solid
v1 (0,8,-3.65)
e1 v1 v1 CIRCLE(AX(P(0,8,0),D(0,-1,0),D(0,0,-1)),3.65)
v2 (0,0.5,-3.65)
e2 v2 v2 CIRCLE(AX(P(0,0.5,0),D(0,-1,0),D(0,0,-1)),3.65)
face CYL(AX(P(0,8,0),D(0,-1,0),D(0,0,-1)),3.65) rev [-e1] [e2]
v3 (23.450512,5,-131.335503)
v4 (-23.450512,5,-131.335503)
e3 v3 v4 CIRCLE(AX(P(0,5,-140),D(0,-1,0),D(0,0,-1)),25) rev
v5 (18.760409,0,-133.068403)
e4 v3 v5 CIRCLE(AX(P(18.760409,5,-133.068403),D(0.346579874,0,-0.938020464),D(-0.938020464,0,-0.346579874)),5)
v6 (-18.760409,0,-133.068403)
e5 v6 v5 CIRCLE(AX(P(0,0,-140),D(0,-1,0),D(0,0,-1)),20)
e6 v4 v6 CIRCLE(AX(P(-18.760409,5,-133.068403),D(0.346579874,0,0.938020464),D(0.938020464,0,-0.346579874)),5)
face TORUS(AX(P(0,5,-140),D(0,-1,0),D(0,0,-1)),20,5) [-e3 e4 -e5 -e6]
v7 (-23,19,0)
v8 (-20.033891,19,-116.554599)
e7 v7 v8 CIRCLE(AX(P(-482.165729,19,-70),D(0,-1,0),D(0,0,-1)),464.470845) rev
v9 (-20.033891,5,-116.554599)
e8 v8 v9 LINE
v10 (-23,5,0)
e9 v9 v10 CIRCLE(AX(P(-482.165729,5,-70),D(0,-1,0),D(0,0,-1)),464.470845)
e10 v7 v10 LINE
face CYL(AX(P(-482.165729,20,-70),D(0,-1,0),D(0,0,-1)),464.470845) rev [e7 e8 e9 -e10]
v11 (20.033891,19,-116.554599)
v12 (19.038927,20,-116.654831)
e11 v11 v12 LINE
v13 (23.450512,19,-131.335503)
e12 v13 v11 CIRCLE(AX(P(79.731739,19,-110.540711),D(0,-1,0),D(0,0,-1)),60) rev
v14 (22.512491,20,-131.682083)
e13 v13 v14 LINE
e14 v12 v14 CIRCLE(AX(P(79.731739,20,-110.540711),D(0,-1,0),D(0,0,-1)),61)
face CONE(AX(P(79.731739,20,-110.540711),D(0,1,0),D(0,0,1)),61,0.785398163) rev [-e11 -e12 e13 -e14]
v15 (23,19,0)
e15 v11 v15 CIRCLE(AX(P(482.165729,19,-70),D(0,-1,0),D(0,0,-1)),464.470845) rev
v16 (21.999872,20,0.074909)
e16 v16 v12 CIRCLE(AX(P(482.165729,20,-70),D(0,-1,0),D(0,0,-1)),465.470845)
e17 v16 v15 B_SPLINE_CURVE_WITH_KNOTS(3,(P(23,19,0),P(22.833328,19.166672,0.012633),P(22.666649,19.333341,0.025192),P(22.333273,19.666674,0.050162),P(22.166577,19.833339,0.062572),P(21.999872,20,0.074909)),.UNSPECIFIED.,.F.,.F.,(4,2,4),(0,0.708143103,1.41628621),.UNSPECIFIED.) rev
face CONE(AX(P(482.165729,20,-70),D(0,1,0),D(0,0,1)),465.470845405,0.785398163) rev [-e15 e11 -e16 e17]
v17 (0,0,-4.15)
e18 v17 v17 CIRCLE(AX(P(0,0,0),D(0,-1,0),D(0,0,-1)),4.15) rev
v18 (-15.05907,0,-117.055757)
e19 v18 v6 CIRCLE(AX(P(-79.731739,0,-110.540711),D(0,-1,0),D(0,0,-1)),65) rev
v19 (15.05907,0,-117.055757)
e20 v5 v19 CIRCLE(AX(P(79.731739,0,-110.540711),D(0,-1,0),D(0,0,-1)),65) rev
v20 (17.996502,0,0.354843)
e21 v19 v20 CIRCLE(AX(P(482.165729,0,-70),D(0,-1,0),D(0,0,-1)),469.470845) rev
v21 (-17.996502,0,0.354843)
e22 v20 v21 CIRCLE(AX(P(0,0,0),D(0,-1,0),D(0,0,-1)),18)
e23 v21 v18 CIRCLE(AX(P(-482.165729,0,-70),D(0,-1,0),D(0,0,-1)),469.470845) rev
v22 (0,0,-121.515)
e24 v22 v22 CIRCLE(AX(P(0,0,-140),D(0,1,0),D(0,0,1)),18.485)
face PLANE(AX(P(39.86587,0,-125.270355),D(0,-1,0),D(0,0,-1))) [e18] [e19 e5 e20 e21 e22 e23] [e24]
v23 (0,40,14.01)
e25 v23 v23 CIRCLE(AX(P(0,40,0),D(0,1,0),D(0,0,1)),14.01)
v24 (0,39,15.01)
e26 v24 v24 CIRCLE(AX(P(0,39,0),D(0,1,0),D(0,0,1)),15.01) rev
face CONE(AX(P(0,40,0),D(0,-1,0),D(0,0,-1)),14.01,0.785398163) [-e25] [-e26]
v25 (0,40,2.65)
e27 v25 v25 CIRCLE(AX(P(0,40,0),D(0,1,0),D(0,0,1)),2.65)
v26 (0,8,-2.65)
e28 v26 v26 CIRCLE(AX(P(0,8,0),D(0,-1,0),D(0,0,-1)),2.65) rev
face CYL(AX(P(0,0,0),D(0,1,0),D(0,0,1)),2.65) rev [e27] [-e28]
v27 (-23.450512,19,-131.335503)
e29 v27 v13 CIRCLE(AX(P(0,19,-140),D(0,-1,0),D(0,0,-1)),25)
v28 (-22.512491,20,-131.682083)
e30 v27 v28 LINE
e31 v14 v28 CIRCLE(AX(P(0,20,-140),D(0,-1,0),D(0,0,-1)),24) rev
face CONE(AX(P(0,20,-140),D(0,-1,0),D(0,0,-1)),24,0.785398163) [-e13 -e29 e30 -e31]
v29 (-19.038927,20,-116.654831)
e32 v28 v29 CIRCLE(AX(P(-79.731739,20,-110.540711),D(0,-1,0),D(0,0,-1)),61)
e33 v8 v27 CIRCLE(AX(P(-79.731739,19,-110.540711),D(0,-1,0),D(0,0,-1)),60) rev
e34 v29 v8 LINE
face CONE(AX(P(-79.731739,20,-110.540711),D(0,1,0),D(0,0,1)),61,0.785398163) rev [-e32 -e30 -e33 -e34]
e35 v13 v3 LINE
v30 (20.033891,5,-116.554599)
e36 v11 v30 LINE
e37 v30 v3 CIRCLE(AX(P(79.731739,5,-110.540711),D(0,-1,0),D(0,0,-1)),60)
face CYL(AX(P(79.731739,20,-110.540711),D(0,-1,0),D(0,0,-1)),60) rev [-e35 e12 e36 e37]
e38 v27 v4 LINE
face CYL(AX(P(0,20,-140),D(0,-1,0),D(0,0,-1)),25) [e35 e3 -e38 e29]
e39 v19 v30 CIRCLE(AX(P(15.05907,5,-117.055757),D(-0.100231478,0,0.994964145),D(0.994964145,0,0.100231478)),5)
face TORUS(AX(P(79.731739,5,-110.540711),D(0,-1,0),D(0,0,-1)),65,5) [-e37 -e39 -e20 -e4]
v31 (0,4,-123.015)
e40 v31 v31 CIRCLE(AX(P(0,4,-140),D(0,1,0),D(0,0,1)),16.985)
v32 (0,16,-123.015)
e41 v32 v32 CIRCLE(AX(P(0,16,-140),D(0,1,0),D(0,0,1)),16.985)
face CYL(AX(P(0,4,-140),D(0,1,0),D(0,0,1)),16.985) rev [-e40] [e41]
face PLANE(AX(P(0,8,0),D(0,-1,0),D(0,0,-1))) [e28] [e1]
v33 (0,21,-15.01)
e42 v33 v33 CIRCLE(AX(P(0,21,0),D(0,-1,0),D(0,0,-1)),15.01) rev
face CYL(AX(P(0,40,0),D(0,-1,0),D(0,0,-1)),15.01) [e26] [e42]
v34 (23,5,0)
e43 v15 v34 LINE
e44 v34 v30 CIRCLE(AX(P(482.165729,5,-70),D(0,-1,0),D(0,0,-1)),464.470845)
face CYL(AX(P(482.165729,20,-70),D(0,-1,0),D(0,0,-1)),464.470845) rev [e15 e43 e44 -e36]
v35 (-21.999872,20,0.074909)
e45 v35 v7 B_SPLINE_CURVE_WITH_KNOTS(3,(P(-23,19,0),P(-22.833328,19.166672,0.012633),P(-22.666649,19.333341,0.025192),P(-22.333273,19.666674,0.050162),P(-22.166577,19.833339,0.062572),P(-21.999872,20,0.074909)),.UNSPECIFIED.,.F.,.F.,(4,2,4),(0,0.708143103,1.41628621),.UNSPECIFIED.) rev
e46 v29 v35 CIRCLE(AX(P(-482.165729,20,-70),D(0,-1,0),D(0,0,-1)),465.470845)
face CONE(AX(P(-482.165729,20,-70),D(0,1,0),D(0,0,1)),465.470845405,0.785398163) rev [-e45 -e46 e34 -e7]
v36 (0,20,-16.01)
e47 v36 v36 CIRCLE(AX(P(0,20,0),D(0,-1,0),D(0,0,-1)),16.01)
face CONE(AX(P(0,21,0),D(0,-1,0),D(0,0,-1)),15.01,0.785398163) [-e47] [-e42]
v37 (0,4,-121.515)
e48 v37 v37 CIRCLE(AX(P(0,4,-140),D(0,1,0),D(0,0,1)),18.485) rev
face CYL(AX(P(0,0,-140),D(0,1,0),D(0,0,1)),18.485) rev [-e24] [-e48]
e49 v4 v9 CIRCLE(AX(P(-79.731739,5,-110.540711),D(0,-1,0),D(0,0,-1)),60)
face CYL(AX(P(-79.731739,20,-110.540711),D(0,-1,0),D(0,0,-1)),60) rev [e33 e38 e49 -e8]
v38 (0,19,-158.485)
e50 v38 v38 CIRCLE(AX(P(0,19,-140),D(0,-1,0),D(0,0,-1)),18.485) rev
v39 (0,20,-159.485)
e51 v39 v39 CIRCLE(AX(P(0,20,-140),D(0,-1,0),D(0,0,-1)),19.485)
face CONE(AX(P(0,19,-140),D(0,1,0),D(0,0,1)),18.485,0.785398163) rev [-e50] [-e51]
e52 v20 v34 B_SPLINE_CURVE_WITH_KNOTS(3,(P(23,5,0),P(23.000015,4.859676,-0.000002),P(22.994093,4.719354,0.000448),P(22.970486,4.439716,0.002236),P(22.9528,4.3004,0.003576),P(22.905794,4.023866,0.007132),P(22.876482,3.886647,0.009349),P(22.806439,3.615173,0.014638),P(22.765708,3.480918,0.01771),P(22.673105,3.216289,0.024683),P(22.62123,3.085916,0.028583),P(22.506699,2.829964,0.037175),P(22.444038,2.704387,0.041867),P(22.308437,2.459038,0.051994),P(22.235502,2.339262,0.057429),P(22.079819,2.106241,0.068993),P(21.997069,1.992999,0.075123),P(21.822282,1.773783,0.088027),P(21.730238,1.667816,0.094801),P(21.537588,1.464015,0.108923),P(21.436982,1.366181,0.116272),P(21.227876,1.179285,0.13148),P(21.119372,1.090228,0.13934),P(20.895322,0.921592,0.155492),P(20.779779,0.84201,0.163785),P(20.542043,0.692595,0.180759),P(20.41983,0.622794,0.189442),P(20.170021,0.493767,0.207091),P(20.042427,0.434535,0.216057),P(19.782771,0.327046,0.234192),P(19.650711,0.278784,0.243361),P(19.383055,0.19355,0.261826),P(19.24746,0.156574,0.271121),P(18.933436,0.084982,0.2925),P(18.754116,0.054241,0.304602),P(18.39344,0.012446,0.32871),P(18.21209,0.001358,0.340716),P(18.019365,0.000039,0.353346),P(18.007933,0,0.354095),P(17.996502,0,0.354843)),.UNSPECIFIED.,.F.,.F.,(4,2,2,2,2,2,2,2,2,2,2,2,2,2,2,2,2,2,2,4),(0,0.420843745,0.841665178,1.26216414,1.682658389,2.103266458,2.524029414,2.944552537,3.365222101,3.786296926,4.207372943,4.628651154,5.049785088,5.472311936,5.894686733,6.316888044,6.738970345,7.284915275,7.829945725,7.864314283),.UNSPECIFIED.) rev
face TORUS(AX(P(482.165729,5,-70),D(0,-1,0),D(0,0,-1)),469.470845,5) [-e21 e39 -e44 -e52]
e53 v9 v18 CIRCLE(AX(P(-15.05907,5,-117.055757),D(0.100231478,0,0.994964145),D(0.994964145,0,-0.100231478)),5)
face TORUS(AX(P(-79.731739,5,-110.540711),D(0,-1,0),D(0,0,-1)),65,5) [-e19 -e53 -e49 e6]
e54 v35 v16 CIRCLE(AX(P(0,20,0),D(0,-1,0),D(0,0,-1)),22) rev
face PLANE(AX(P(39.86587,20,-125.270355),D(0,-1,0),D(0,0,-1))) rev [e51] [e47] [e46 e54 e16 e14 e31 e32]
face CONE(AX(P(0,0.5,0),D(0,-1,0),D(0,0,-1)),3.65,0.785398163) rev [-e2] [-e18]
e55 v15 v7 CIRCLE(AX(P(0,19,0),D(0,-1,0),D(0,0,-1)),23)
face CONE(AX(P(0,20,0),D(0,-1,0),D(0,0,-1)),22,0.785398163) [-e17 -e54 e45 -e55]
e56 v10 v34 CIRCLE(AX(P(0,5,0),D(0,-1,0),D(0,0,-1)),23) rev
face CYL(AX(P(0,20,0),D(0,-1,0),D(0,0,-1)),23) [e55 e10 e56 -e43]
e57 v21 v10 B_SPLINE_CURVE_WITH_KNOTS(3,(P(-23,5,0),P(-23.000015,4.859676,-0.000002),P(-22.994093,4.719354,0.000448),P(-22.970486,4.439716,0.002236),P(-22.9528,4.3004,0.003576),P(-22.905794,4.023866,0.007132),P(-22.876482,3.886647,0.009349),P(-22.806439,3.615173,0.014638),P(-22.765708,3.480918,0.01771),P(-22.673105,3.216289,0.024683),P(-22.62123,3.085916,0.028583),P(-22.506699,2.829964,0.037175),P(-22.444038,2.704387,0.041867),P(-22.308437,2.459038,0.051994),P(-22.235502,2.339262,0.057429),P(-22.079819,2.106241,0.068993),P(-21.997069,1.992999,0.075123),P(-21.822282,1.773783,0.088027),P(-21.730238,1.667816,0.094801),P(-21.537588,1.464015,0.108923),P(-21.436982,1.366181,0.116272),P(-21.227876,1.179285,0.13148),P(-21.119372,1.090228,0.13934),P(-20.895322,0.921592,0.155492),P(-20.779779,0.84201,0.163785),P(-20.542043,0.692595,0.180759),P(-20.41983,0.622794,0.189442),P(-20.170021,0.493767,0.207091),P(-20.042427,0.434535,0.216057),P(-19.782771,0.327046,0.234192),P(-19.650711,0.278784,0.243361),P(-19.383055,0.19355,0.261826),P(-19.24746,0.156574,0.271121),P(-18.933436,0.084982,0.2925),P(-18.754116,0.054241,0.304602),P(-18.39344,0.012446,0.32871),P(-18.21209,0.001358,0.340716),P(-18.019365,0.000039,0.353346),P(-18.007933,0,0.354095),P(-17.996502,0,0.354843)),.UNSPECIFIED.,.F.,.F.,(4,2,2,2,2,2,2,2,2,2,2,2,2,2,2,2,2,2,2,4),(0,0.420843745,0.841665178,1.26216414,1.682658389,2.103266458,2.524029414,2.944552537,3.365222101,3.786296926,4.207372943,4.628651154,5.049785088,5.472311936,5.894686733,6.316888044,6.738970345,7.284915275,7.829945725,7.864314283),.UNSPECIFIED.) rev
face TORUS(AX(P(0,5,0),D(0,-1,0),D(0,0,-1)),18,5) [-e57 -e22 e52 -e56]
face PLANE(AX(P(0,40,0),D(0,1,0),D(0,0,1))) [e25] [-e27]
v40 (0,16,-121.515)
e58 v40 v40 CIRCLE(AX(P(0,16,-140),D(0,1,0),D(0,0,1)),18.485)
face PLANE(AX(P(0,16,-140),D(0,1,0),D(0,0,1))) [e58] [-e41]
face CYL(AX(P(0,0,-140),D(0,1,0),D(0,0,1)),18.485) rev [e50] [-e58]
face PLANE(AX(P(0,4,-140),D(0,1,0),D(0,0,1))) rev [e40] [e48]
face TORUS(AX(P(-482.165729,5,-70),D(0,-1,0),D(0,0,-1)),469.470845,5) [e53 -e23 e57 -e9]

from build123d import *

# Parameters (mm, degrees)
BOSS_EXTRUDE1_DEPTH      = 20
SKETCH2_R                = 15.01
BOSS_EXTRUDE2_DEPTH      = 20
CHAMFER1_SIZE            = 1
SKETCH3_R                = 18.485
CUT_EXTRUDE1_DEPTH       = 20
CHAMFER3_SIZE            = 1
SKETCH5_R                = 2.65
CUT_EXTRUDE2_DEPTH       = 40
FILLET3_R                = 5
SKETCH6_R                = 3.65
CUT_EXTRUDE3_DEPTH       = 8
CHAMFER4_SIZE            = 0.5
BOSS_EXTRUDE3_DEPTH      = 6
BOSS_EXTRUDE3_DEPTH_BACK = 6
SKETCH7_R                = 18.485000000000003
SKETCH7_R_2              = 16.984999999999996


with BuildPart() as part:
    # Sketch1 → Boss-Extrude1 (new body)
    with BuildSketch(Plane(origin=(0, 0, 0), x_dir=(1, 0, 0), z_dir=(0, 1, 0))):
        with BuildLine():
            ThreePointArc((-23, 0), (1.41e-15, -22.999999999999982), (23, 0))
            ThreePointArc((23, 0), (17.845208734768505, 58.18386045047181), (20.033890701411753, 116.55459936267802))
            ThreePointArc((20.033890701411753, 116.55459936267802), (21.27316153822275, 124.05347023326534), (23.45051159720983, 131.33550314045155))
            ThreePointArc((23.45051159720983, 131.33550314045155), (-2.067e-14, 165.00000000000006), (-23.45051159720983, 131.3355031404515))
            ThreePointArc((-23.45051159720983, 131.3355031404515), (-21.27316153822273, 124.05347023326526), (-20.033890701411725, 116.55459936267786))
            ThreePointArc((-20.033890701411725, 116.55459936267786), (-17.845208734768505, 58.1838604504716), (-23, 0))
        make_face()
    extrude(amount=BOSS_EXTRUDE1_DEPTH)

    # Sketch2 → Boss-Extrude2 (add)
    with BuildSketch(Plane(origin=(0, 20, 0), x_dir=(1, 0, 0), z_dir=(0, 1, 0))):
        with Locations(Location((0, 0, 0), (0, 0, 90))):
            Circle(SKETCH2_R)
    extrude(amount=BOSS_EXTRUDE2_DEPTH)

    # Chamfer1
    chamfer1_edges = [part.edges().sort_by_distance(p)[0] for p in [
        (-2.76e-15, 40, 15.01),
    ]]
    chamfer(chamfer1_edges, length=CHAMFER1_SIZE)

    # Sketch3 → Cut-Extrude1 (cut)
    with BuildSketch(Plane(origin=(0, 20, 0), x_dir=(1, 0, 0), z_dir=(0, 1, 0))):
        with Locations(Location((0, 140.00000000000009, 0), (0, 0, 270))):
            Circle(SKETCH3_R)
    extrude(amount=-CUT_EXTRUDE1_DEPTH, mode=Mode.SUBTRACT)

    # Chamfer3
    # the kernel refuses this chamfer: 1 mm, written as the material it adds along each edge
    with BuildSketch(Plane(origin=(0, 20, 0), x_dir=(6e-17, 0, -1), z_dir=(1, 0, 6e-17))) as chamfer3_piece_1:
        Polygon((15.01, CHAMFER3_SIZE), (15.01 + CHAMFER3_SIZE, 0), (15.01, 0), align=None)
    revolve(axis=Axis((0, 20, 0), (0, 1, 0)))
    # the kernel refuses this chamfer: 1 mm, written as the material it takes off along each edge
    with BuildSketch(Plane(origin=(-79.73173943051358, 20, -110.54071067753486), x_dir=(0.9380204638883933, 0, -0.3465798743819428), z_dir=(-0.3465798743819428, 0, -0.9380204638883933))) as chamfer3_2_piece_1:
        Polygon((60.00000000000017 + CHAMFER3_SIZE, 0), (60.00000000000017, CHAMFER3_SIZE), (60.00000000000017, 0), align=None)
    revolve(axis=Axis((-79.73173943051358, 20, -110.54071067753486), (0, -1, 0)), revolution_arc=14.525766875036835, mode=Mode.SUBTRACT)
    with BuildSketch(Plane(origin=(-482.16572850262514, 20, -70.00000000000004), x_dir=(0.9949641454850282, 0, -0.1002314780857173), z_dir=(-0.1002314780857173, 0, -0.9949641454850282))) as chamfer3_2_piece_2:
        Polygon((464.4708454051196 + CHAMFER3_SIZE, 0), (464.4708454051196, CHAMFER3_SIZE), (464.4708454051196, 0), align=None)
    revolve(axis=Axis((-482.16572850262514, 20, -70.00000000000004), (0, -1, 0)), revolution_arc=14.737763084908373, mode=Mode.SUBTRACT)
    with BuildSketch(Plane(origin=(0, 20, -1.599e-14), x_dir=(-0.9937354343699007, 0, -0.11175816067592001), z_dir=(0.11175816067592001, 0, -0.9937354343699007))) as chamfer3_2_piece_3:
        Polygon((23.000000000000004 - CHAMFER3_SIZE, 0), (23.000000000000004, -CHAMFER3_SIZE), (23.000000000000004, 0), align=None)
    revolve(axis=Axis((0, 20, -1.599e-14), (0, 1, 0)), revolution_arc=192.83335153216495, mode=Mode.SUBTRACT)
    with BuildSketch(Plane(origin=(482.16572850261997, 20, -69.99999999999986), x_dir=(-0.9877285445231084, 0, 0.15618041597544133), z_dir=(0.15618041597544133, 0, 0.9877285445231084))) as chamfer3_2_piece_4:
        Polygon((464.4708454051149 + CHAMFER3_SIZE, 0), (464.47084540511446, CHAMFER3_SIZE), (464.4708454051149, 0), align=None)
    revolve(axis=Axis((482.16572850261997, 20, -69.99999999999986), (0, -1, 0)), revolution_arc=14.737763084908554, mode=Mode.SUBTRACT)
    with BuildSketch(Plane(origin=(0, 20, -140.00000000000009), x_dir=(-1.8e-16, 0, 1), z_dir=(-1, 0, -1.8e-16))) as chamfer3_2_piece_5:
        Polygon((18.485 + CHAMFER3_SIZE, 0), (18.485, -CHAMFER3_SIZE), (18.485, 0), align=None)
    revolve(axis=Axis((0, 20, -140.00000000000009), (0, 1, 0)), mode=Mode.SUBTRACT)
    with BuildSketch(Plane(origin=(79.7317394305139, 20, -110.54071067753493), x_dir=(-0.9949641454850281, 0, -0.10023147808571735), z_dir=(-0.10023147808571735, 0, 0.9949641454850281))) as chamfer3_2_piece_6:
        Polygon((60.000000000000455 + CHAMFER3_SIZE, 0), (60.000000000000455, CHAMFER3_SIZE), (60.000000000000455, 0), align=None)
    revolve(axis=Axis((79.7317394305139, 20, -110.54071067753493), (0, -1, 0)), revolution_arc=14.525766875036666, mode=Mode.SUBTRACT)
    with BuildSketch(Plane(origin=(9.77e-15, 20, -140.00000000000006), x_dir=(0.9380204638883942, 0, 0.3465798743819405), z_dir=(-0.3465798743819405, 0, 0.9380204638883942))) as chamfer3_2_piece_7:
        Polygon((24.999999999999982 - CHAMFER3_SIZE, 0), (24.999999999999982, -CHAMFER3_SIZE), (24.999999999999982, 0), align=None)
    revolve(axis=Axis((9.77e-15, 20, -140.00000000000006), (0, 1, 0)), revolution_arc=220.55653408148345, mode=Mode.SUBTRACT)

    # Sketch5 → Cut-Extrude2 (cut)
    with BuildSketch(Plane(origin=(0, 40, 0), x_dir=(1, 0, 0), z_dir=(0, 1, 0))):
        with Locations(Location((0, 0, 0), (0, 0, 270))):
            Circle(SKETCH5_R)
    extrude(amount=-CUT_EXTRUDE2_DEPTH, mode=Mode.SUBTRACT)

    # Fillet3
    # the kernel refuses this fillet: 5 mm, written as the material it takes off along each edge
    with BuildSketch(Plane(origin=(482.16572850261997, 0, -69.99999999999986), x_dir=(-0.9868985080370148, 0, 0.1613422909045059), z_dir=(0.1613422909045059, 0, 0.9868985080370148))) as fillet3_piece_1:
        with BuildLine():
            CenterArc((464.4708454051144 + FILLET3_R, -FILLET3_R), FILLET3_R, 89.99999999999935, 90.00000000000068)
            Line((464.4708454051144 + FILLET3_R, 8.9e-16), (464.4708454051144 + FILLET3_R, FILLET3_R * 0.02))
            Line((464.4708454051144 + FILLET3_R, FILLET3_R * 0.02), (464.4708454051144 - FILLET3_R * 0.02, FILLET3_R * 0.02))
            Line((464.4708454051144 - FILLET3_R * 0.02, FILLET3_R * 0.02), (464.4708454051144 - FILLET3_R * 0.02, -FILLET3_R))
            Line((464.4708454051144 - FILLET3_R * 0.02, -FILLET3_R), (464.4708454051144, -FILLET3_R))
        make_face()
    revolve(axis=Axis((482.16572850261997, 0, -69.99999999999986), (0, -1, 0)), revolution_arc=15.03731633345655, mode=Mode.SUBTRACT)
    with BuildSketch(Plane(origin=(0, 0, -1.599e-14), x_dir=(-0.9763879588864252, 0, -0.21602442857603077), z_dir=(0.21602442857603077, 0, -0.9763879588864252))) as fillet3_piece_2:
        with BuildLine():
            CenterArc((23 - FILLET3_R, FILLET3_R), FILLET3_R, 269.99999999999994, 90.00000000000006)
            Line((23 - FILLET3_R, -8.9e-16), (23 - FILLET3_R, -FILLET3_R * 0.02))
            Line((23 - FILLET3_R, -FILLET3_R * 0.02), (23 + FILLET3_R * 0.02, -FILLET3_R * 0.02))
            Line((23 + FILLET3_R * 0.02, -FILLET3_R * 0.02), (23 + FILLET3_R * 0.02, FILLET3_R))
            Line((23 + FILLET3_R * 0.02, FILLET3_R), (23.000000000000004, FILLET3_R))
        make_face()
    revolve(axis=Axis((0, 0, -1.599e-14), (0, 1, 0)), revolution_arc=204.95127041750123, mode=Mode.SUBTRACT)
    with BuildSketch(Plane(origin=(-482.16572850262514, 0, -70.00000000000004), x_dir=(0.9949641454850282, 0, -0.1002314780857173), z_dir=(-0.1002314780857173, 0, -0.9949641454850282))) as fillet3_piece_3:
        with BuildLine():
            CenterArc((464.4708454051196 + FILLET3_R, -FILLET3_R), FILLET3_R, 90, 90)
            Line((464.4708454051196 + FILLET3_R, 8.9e-16), (464.4708454051196 + FILLET3_R, FILLET3_R * 0.02))
            Line((464.4708454051196 + FILLET3_R, FILLET3_R * 0.02), (464.4708454051196 - FILLET3_R * 0.02, FILLET3_R * 0.02))
            Line((464.4708454051196 - FILLET3_R * 0.02, FILLET3_R * 0.02), (464.4708454051196 - FILLET3_R * 0.02, -FILLET3_R))
            Line((464.4708454051196 - FILLET3_R * 0.02, -FILLET3_R), (464.4708454051196, -FILLET3_R))
        make_face()
    revolve(axis=Axis((-482.16572850262514, 0, -70.00000000000004), (0, -1, 0)), revolution_arc=15.037316333456364, mode=Mode.SUBTRACT)
    with BuildSketch(Plane(origin=(-79.73173943051358, 0, -110.54071067753486), x_dir=(0.9380204638883933, 0, -0.3465798743819428), z_dir=(-0.3465798743819428, 0, -0.9380204638883933))) as fillet3_piece_4:
        with BuildLine():
            CenterArc((60.00000000000017 + FILLET3_R, -FILLET3_R), FILLET3_R, 90, 90)
            Line((60.00000000000017 + FILLET3_R, 8.9e-16), (60.00000000000017 + FILLET3_R, FILLET3_R * 0.02))
            Line((60.00000000000017 + FILLET3_R, FILLET3_R * 0.02), (60.00000000000017 - FILLET3_R * 0.02, FILLET3_R * 0.02))
            Line((60.00000000000017 - FILLET3_R * 0.02, FILLET3_R * 0.02), (60.00000000000017 - FILLET3_R * 0.02, -FILLET3_R))
            Line((60.00000000000017 - FILLET3_R * 0.02, -FILLET3_R), (60.00000000000018, -FILLET3_R))
        make_face()
    revolve(axis=Axis((-79.73173943051358, 0, -110.54071067753486), (0, -1, 0)), revolution_arc=14.525766875036835, mode=Mode.SUBTRACT)
    with BuildSketch(Plane(origin=(9.77e-15, 0, -140.00000000000006), x_dir=(0.9380204638883942, 0, 0.3465798743819405), z_dir=(-0.3465798743819405, 0, 0.9380204638883942))) as fillet3_piece_5:
        with BuildLine():
            CenterArc((24.999999999999982 - FILLET3_R, FILLET3_R), FILLET3_R, 270, 90)
            Line((24.999999999999982 - FILLET3_R, -8.9e-16), (24.999999999999982 - FILLET3_R, -FILLET3_R * 0.02))
            Line((24.999999999999982 - FILLET3_R, -FILLET3_R * 0.02), (24.999999999999982 + FILLET3_R * 0.02, -FILLET3_R * 0.02))
            Line((24.999999999999982 + FILLET3_R * 0.02, -FILLET3_R * 0.02), (24.999999999999982 + FILLET3_R * 0.02, FILLET3_R))
            Line((24.999999999999982 + FILLET3_R * 0.02, FILLET3_R), (24.999999999999986, FILLET3_R))
        make_face()
    revolve(axis=Axis((9.77e-15, 0, -140.00000000000006), (0, 1, 0)), revolution_arc=220.55653408148345, mode=Mode.SUBTRACT)
    with BuildSketch(Plane(origin=(79.7317394305139, 0, -110.54071067753493), x_dir=(-0.9949641454850281, 0, -0.10023147808571735), z_dir=(-0.10023147808571735, 0, 0.9949641454850281))) as fillet3_piece_6:
        with BuildLine():
            CenterArc((60.000000000000455 + FILLET3_R, -FILLET3_R), FILLET3_R, 90, 90)
            Line((60.000000000000455 + FILLET3_R, 8.9e-16), (60.000000000000455 + FILLET3_R, FILLET3_R * 0.02))
            Line((60.000000000000455 + FILLET3_R, FILLET3_R * 0.02), (60.000000000000455 - FILLET3_R * 0.02, FILLET3_R * 0.02))
            Line((60.000000000000455 - FILLET3_R * 0.02, FILLET3_R * 0.02), (60.000000000000455 - FILLET3_R * 0.02, -FILLET3_R))
            Line((60.000000000000455 - FILLET3_R * 0.02, -FILLET3_R), (60.000000000000455, -FILLET3_R))
        make_face()
    revolve(axis=Axis((79.7317394305139, 0, -110.54071067753493), (0, -1, 0)), revolution_arc=14.525766875036666, mode=Mode.SUBTRACT)

    # Sketch6 → Cut-Extrude3 (cut)
    with BuildSketch(Plane.XZ):
        with Locations(Location((0, 0, 0), (0, 0, 270))):
            Circle(SKETCH6_R)
    extrude(amount=-CUT_EXTRUDE3_DEPTH, mode=Mode.SUBTRACT)

    # Chamfer4
    chamfer4_edges = [part.edges().sort_by_distance(p)[0] for p in [
        (1.12e-15, 0, 3.65),
    ]]
    chamfer(chamfer4_edges, length=CHAMFER4_SIZE)

    # Sketch7 → Boss-Extrude3 (add, two sides: drawn at the far end of the back side and taken through both)
    with BuildSketch(Plane(origin=(0, 10, 0), x_dir=(1, 0, 0), z_dir=(0, 1, 0)).offset(-BOSS_EXTRUDE3_DEPTH_BACK)):
        with Locations(Location((0, 140.00000000000009, 0), (0, 0, 270))):
            Circle(SKETCH7_R)
        with Locations(Location((0, 140.00000000000009, 0), (0, 0, 270))):
            Circle(SKETCH7_R_2, mode=Mode.SUBTRACT)
    extrude(amount=BOSS_EXTRUDE3_DEPTH + BOSS_EXTRUDE3_DEPTH_BACK)


solid = part.part
